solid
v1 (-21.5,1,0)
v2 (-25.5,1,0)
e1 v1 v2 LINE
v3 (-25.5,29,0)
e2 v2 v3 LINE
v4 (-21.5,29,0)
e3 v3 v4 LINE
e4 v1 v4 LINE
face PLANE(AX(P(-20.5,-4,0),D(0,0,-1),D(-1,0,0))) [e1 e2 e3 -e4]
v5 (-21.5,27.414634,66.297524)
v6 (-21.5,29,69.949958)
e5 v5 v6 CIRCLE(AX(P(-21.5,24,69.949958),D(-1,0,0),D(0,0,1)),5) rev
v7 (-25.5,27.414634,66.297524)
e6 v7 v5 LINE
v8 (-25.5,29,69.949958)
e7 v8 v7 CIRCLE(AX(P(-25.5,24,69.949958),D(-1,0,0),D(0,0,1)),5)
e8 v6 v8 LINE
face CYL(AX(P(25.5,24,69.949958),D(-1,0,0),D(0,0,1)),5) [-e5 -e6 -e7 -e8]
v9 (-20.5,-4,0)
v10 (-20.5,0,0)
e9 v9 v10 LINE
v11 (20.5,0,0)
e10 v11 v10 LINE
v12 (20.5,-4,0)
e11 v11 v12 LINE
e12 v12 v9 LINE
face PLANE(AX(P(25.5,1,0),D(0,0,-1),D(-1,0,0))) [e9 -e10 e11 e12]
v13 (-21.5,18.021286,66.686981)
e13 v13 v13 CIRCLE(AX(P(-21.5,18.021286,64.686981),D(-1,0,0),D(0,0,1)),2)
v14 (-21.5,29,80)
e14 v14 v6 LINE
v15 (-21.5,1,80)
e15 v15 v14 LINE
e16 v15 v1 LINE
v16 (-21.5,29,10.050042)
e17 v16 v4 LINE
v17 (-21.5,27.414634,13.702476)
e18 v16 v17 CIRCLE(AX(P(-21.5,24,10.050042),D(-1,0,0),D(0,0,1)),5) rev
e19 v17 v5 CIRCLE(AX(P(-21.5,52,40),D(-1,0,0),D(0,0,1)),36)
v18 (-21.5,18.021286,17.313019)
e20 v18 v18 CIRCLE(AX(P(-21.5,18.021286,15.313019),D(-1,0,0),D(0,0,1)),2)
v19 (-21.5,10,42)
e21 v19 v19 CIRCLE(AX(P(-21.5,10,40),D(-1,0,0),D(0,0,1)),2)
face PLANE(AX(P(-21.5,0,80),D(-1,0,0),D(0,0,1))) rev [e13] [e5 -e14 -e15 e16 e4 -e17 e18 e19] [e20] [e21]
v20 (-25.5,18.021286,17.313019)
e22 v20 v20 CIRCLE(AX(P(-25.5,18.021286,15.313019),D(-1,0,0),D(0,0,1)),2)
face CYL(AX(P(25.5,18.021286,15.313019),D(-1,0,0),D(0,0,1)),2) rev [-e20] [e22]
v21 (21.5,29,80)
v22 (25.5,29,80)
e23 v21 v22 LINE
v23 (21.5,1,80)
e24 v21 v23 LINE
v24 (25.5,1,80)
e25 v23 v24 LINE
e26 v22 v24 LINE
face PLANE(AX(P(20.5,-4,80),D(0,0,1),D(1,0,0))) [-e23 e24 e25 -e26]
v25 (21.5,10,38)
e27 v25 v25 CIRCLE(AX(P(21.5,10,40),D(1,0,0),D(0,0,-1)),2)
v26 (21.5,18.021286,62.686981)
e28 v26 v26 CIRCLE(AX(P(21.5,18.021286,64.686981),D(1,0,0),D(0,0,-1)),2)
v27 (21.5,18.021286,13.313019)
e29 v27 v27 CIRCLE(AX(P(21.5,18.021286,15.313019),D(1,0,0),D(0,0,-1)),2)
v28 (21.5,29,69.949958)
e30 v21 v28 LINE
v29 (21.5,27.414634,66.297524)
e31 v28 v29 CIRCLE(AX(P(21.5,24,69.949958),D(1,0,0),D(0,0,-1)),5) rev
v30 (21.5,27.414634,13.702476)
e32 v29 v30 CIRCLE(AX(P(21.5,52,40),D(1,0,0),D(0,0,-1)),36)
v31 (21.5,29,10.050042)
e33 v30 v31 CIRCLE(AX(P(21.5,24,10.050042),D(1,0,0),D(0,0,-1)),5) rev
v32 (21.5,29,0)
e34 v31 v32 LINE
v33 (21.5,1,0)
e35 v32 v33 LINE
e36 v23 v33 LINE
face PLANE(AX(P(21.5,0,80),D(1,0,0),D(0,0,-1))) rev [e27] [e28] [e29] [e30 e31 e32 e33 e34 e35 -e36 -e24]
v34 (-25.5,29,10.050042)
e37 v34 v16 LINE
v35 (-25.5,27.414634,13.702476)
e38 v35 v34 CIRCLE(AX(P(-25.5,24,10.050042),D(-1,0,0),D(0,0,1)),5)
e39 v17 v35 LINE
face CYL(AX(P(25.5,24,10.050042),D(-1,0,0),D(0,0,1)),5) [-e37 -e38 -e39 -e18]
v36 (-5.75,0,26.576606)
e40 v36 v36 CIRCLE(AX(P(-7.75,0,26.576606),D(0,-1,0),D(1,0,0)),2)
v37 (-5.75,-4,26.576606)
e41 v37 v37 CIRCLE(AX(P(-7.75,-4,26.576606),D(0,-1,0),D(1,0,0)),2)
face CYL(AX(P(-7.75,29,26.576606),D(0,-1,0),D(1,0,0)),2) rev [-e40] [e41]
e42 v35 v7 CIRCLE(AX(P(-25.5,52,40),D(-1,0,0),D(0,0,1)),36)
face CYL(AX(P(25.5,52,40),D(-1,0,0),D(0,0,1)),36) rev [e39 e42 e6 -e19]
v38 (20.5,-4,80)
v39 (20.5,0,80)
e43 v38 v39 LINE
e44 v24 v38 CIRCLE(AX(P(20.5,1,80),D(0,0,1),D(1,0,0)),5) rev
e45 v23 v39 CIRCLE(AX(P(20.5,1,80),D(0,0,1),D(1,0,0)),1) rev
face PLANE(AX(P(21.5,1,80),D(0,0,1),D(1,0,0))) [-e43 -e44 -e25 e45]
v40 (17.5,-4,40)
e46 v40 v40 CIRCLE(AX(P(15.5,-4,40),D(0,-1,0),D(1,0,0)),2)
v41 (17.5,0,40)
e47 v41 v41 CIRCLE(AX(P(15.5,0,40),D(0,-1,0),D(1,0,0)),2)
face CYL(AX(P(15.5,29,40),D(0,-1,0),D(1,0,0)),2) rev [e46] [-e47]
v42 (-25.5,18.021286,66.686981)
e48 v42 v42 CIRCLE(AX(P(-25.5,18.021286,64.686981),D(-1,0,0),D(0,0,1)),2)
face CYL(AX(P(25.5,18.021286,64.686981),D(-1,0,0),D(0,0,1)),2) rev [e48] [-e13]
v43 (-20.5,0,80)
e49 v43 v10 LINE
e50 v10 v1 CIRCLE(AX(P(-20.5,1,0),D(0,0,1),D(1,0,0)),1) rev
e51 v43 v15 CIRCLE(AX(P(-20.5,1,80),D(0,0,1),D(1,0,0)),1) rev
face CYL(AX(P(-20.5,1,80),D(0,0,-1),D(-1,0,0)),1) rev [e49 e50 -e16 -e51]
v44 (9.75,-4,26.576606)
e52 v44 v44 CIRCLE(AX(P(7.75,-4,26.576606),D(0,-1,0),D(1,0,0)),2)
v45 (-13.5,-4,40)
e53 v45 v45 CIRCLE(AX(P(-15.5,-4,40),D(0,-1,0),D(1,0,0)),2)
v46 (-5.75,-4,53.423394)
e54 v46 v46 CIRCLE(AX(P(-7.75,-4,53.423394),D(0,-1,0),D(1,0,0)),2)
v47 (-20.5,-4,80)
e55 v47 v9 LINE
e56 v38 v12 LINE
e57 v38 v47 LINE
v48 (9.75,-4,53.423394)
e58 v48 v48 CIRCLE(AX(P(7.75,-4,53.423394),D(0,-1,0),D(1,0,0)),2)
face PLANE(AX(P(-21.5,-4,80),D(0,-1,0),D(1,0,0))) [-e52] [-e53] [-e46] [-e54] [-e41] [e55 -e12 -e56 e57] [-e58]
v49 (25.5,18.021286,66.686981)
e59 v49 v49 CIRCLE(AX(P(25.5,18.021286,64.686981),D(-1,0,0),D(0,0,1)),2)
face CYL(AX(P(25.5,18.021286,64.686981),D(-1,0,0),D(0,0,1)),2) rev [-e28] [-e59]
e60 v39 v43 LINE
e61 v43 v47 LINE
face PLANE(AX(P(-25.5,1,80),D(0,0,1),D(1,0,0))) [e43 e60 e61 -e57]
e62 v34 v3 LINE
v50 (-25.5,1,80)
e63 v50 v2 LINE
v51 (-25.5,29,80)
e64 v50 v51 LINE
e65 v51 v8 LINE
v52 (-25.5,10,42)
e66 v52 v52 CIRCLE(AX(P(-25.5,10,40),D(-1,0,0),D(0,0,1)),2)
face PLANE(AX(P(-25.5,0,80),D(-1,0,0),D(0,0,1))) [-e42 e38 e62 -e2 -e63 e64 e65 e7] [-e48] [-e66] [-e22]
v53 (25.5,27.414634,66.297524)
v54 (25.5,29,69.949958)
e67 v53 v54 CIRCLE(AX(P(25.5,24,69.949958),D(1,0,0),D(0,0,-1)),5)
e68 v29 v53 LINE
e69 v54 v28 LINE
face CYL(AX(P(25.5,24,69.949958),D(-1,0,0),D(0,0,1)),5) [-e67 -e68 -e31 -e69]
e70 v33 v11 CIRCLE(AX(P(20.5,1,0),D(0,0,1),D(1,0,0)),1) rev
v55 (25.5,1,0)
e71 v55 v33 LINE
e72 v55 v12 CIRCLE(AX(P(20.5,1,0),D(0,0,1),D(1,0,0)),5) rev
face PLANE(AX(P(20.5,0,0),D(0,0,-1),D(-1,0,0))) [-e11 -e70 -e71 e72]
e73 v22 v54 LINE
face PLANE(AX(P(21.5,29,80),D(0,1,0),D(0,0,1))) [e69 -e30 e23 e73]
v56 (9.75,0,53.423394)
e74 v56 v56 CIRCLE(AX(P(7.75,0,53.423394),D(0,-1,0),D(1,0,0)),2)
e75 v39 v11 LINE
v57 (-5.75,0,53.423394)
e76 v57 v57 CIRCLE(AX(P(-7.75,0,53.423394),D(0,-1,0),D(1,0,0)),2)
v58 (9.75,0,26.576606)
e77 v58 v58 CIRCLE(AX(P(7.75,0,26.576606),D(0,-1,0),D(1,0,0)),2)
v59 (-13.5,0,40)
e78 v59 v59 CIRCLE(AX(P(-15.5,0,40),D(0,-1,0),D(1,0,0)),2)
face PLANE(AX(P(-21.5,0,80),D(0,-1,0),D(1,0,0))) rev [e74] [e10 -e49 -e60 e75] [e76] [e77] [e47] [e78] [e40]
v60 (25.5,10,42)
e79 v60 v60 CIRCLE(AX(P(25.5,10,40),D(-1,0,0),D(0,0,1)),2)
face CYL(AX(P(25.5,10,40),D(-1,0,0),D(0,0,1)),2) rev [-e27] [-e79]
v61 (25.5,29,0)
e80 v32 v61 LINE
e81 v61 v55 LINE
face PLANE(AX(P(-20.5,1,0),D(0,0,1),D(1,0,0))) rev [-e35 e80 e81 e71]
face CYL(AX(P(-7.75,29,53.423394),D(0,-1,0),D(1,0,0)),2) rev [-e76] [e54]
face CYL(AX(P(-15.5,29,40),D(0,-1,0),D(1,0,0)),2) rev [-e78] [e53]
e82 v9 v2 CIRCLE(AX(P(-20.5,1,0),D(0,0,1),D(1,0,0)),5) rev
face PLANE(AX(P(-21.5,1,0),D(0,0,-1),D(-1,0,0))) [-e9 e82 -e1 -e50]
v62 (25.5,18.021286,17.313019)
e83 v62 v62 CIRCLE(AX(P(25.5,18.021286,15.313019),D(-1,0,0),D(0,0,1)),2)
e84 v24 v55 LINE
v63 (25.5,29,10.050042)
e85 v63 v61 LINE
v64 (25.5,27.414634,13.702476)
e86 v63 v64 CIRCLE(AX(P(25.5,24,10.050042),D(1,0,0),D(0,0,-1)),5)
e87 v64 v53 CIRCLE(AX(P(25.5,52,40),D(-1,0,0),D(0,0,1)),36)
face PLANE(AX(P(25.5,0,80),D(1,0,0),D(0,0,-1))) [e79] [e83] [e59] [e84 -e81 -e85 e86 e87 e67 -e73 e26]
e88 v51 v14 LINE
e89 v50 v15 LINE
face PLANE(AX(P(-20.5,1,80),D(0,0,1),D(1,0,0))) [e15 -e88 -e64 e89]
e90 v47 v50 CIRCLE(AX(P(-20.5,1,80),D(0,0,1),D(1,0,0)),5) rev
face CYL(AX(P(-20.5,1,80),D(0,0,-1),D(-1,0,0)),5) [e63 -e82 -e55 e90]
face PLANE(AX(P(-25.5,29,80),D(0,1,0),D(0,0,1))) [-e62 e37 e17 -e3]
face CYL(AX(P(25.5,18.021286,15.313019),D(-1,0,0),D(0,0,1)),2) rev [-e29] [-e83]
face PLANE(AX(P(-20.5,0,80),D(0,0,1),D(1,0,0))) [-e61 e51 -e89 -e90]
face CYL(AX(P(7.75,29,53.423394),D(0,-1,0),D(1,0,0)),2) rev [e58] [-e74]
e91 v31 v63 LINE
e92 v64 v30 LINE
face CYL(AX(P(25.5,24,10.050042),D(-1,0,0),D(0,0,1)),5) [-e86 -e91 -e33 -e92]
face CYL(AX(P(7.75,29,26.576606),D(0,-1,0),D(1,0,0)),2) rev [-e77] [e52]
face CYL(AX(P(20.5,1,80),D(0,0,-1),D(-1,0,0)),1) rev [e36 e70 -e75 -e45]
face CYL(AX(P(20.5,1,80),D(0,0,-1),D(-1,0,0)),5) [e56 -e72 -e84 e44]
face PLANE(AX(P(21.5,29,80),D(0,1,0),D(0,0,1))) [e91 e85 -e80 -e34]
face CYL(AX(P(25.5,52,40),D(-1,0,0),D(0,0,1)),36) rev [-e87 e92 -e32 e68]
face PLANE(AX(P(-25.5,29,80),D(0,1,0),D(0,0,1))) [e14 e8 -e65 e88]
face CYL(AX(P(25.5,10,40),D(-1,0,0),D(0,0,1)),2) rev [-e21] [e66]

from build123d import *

# Parameters (mm, degrees)
SM_BASE_FLANGE_1_DEPTH   = 80
CUT_EXTRUDE_3_DEPTH      = 100.206854602
CUT_EXTRUDE_3_DEPTH_BACK = 100.206854602
SKETCH_6_R               = 36
SKETCH_6_R_2             = 2
FILLET_1_R               = 5
SKETCH_9_R               = 2
CUT_EXTRUDE_4_DEPTH      = 91.217792037


# Sheet-metal steps are written as plain solids
with BuildPart() as part:
    # Sketch 1 → Базовая кромка1 (new body)
    with BuildSketch(Plane.XY):
        with BuildLine():
            Line((-21.5, 29), (-21.5, 1))
            ThreePointArc((-21.5, 1), (-21.207106781, 0.292893219), (-20.5, 0))
            Line((-20.5, 0), (20.5, 0))
            ThreePointArc((20.5, 0), (21.207106781, 0.292893219), (21.5, 1))
            Line((21.5, 1), (21.5, 29))
            Line((21.5, 29), (25.5, 29))
            Line((25.5, 29), (25.5, 1))
            ThreePointArc((25.5, 1), (24.035533906, -2.535533906), (20.5, -4))
            Line((20.5, -4), (-20.5, -4))
            ThreePointArc((-20.5, -4), (-24.035533906, -2.535533906), (-25.5, 1))
            Line((-25.5, 1), (-25.5, 29))
            Line((-25.5, 29), (-21.5, 29))
        make_face()
    extrude(amount=SM_BASE_FLANGE_1_DEPTH)

    # Эскиз6 → Вырез-Вытянуть3 (cut, two sides: drawn at the far end of the back side and taken through both)
    with BuildSketch(Plane.ZY.offset(25.5).offset(-CUT_EXTRUDE_3_DEPTH_BACK)):
        with Locations((40, 52)):
            Circle(SKETCH_6_R)
        with Locations((40, 10)):
            Circle(SKETCH_6_R_2)
        with Locations((15.313019404, 18.021286236)):
            Circle(SKETCH_6_R_2)
        with Locations((64.686980596, 18.021286236)):
            Circle(SKETCH_6_R_2)
    extrude(amount=CUT_EXTRUDE_3_DEPTH + CUT_EXTRUDE_3_DEPTH_BACK, mode=Mode.SUBTRACT)

    # Скругление1
    fillet_1_edges = [part.edges().sort_by_distance(p)[0] for p in [
        (23.5, 29, 12.305235152),
        (23.5, 29, 67.694764848),
        (-23.5, 29, 12.305235152),
        (-23.5, 29, 67.694764848),
    ]]
    fillet(fillet_1_edges, radius=FILLET_1_R)

    # Эскиз9 → Вырез-Вытянуть4 (cut, through all)
    with BuildSketch(Plane.XZ.offset(4)):
        with Locations((15.5, 40)):
            Circle(SKETCH_9_R)
        with Locations((7.75, 26.576606241)):
            Circle(SKETCH_9_R)
        with Locations((-7.75, 26.576606241)):
            Circle(SKETCH_9_R)
        with Locations((-15.5, 40)):
            Circle(SKETCH_9_R)
        with Locations((-7.75, 53.423393759)):
            Circle(SKETCH_9_R)
        with Locations((7.75, 53.423393759)):
            Circle(SKETCH_9_R)
    extrude(amount=-CUT_EXTRUDE_4_DEPTH, mode=Mode.SUBTRACT)


solid = part.part
